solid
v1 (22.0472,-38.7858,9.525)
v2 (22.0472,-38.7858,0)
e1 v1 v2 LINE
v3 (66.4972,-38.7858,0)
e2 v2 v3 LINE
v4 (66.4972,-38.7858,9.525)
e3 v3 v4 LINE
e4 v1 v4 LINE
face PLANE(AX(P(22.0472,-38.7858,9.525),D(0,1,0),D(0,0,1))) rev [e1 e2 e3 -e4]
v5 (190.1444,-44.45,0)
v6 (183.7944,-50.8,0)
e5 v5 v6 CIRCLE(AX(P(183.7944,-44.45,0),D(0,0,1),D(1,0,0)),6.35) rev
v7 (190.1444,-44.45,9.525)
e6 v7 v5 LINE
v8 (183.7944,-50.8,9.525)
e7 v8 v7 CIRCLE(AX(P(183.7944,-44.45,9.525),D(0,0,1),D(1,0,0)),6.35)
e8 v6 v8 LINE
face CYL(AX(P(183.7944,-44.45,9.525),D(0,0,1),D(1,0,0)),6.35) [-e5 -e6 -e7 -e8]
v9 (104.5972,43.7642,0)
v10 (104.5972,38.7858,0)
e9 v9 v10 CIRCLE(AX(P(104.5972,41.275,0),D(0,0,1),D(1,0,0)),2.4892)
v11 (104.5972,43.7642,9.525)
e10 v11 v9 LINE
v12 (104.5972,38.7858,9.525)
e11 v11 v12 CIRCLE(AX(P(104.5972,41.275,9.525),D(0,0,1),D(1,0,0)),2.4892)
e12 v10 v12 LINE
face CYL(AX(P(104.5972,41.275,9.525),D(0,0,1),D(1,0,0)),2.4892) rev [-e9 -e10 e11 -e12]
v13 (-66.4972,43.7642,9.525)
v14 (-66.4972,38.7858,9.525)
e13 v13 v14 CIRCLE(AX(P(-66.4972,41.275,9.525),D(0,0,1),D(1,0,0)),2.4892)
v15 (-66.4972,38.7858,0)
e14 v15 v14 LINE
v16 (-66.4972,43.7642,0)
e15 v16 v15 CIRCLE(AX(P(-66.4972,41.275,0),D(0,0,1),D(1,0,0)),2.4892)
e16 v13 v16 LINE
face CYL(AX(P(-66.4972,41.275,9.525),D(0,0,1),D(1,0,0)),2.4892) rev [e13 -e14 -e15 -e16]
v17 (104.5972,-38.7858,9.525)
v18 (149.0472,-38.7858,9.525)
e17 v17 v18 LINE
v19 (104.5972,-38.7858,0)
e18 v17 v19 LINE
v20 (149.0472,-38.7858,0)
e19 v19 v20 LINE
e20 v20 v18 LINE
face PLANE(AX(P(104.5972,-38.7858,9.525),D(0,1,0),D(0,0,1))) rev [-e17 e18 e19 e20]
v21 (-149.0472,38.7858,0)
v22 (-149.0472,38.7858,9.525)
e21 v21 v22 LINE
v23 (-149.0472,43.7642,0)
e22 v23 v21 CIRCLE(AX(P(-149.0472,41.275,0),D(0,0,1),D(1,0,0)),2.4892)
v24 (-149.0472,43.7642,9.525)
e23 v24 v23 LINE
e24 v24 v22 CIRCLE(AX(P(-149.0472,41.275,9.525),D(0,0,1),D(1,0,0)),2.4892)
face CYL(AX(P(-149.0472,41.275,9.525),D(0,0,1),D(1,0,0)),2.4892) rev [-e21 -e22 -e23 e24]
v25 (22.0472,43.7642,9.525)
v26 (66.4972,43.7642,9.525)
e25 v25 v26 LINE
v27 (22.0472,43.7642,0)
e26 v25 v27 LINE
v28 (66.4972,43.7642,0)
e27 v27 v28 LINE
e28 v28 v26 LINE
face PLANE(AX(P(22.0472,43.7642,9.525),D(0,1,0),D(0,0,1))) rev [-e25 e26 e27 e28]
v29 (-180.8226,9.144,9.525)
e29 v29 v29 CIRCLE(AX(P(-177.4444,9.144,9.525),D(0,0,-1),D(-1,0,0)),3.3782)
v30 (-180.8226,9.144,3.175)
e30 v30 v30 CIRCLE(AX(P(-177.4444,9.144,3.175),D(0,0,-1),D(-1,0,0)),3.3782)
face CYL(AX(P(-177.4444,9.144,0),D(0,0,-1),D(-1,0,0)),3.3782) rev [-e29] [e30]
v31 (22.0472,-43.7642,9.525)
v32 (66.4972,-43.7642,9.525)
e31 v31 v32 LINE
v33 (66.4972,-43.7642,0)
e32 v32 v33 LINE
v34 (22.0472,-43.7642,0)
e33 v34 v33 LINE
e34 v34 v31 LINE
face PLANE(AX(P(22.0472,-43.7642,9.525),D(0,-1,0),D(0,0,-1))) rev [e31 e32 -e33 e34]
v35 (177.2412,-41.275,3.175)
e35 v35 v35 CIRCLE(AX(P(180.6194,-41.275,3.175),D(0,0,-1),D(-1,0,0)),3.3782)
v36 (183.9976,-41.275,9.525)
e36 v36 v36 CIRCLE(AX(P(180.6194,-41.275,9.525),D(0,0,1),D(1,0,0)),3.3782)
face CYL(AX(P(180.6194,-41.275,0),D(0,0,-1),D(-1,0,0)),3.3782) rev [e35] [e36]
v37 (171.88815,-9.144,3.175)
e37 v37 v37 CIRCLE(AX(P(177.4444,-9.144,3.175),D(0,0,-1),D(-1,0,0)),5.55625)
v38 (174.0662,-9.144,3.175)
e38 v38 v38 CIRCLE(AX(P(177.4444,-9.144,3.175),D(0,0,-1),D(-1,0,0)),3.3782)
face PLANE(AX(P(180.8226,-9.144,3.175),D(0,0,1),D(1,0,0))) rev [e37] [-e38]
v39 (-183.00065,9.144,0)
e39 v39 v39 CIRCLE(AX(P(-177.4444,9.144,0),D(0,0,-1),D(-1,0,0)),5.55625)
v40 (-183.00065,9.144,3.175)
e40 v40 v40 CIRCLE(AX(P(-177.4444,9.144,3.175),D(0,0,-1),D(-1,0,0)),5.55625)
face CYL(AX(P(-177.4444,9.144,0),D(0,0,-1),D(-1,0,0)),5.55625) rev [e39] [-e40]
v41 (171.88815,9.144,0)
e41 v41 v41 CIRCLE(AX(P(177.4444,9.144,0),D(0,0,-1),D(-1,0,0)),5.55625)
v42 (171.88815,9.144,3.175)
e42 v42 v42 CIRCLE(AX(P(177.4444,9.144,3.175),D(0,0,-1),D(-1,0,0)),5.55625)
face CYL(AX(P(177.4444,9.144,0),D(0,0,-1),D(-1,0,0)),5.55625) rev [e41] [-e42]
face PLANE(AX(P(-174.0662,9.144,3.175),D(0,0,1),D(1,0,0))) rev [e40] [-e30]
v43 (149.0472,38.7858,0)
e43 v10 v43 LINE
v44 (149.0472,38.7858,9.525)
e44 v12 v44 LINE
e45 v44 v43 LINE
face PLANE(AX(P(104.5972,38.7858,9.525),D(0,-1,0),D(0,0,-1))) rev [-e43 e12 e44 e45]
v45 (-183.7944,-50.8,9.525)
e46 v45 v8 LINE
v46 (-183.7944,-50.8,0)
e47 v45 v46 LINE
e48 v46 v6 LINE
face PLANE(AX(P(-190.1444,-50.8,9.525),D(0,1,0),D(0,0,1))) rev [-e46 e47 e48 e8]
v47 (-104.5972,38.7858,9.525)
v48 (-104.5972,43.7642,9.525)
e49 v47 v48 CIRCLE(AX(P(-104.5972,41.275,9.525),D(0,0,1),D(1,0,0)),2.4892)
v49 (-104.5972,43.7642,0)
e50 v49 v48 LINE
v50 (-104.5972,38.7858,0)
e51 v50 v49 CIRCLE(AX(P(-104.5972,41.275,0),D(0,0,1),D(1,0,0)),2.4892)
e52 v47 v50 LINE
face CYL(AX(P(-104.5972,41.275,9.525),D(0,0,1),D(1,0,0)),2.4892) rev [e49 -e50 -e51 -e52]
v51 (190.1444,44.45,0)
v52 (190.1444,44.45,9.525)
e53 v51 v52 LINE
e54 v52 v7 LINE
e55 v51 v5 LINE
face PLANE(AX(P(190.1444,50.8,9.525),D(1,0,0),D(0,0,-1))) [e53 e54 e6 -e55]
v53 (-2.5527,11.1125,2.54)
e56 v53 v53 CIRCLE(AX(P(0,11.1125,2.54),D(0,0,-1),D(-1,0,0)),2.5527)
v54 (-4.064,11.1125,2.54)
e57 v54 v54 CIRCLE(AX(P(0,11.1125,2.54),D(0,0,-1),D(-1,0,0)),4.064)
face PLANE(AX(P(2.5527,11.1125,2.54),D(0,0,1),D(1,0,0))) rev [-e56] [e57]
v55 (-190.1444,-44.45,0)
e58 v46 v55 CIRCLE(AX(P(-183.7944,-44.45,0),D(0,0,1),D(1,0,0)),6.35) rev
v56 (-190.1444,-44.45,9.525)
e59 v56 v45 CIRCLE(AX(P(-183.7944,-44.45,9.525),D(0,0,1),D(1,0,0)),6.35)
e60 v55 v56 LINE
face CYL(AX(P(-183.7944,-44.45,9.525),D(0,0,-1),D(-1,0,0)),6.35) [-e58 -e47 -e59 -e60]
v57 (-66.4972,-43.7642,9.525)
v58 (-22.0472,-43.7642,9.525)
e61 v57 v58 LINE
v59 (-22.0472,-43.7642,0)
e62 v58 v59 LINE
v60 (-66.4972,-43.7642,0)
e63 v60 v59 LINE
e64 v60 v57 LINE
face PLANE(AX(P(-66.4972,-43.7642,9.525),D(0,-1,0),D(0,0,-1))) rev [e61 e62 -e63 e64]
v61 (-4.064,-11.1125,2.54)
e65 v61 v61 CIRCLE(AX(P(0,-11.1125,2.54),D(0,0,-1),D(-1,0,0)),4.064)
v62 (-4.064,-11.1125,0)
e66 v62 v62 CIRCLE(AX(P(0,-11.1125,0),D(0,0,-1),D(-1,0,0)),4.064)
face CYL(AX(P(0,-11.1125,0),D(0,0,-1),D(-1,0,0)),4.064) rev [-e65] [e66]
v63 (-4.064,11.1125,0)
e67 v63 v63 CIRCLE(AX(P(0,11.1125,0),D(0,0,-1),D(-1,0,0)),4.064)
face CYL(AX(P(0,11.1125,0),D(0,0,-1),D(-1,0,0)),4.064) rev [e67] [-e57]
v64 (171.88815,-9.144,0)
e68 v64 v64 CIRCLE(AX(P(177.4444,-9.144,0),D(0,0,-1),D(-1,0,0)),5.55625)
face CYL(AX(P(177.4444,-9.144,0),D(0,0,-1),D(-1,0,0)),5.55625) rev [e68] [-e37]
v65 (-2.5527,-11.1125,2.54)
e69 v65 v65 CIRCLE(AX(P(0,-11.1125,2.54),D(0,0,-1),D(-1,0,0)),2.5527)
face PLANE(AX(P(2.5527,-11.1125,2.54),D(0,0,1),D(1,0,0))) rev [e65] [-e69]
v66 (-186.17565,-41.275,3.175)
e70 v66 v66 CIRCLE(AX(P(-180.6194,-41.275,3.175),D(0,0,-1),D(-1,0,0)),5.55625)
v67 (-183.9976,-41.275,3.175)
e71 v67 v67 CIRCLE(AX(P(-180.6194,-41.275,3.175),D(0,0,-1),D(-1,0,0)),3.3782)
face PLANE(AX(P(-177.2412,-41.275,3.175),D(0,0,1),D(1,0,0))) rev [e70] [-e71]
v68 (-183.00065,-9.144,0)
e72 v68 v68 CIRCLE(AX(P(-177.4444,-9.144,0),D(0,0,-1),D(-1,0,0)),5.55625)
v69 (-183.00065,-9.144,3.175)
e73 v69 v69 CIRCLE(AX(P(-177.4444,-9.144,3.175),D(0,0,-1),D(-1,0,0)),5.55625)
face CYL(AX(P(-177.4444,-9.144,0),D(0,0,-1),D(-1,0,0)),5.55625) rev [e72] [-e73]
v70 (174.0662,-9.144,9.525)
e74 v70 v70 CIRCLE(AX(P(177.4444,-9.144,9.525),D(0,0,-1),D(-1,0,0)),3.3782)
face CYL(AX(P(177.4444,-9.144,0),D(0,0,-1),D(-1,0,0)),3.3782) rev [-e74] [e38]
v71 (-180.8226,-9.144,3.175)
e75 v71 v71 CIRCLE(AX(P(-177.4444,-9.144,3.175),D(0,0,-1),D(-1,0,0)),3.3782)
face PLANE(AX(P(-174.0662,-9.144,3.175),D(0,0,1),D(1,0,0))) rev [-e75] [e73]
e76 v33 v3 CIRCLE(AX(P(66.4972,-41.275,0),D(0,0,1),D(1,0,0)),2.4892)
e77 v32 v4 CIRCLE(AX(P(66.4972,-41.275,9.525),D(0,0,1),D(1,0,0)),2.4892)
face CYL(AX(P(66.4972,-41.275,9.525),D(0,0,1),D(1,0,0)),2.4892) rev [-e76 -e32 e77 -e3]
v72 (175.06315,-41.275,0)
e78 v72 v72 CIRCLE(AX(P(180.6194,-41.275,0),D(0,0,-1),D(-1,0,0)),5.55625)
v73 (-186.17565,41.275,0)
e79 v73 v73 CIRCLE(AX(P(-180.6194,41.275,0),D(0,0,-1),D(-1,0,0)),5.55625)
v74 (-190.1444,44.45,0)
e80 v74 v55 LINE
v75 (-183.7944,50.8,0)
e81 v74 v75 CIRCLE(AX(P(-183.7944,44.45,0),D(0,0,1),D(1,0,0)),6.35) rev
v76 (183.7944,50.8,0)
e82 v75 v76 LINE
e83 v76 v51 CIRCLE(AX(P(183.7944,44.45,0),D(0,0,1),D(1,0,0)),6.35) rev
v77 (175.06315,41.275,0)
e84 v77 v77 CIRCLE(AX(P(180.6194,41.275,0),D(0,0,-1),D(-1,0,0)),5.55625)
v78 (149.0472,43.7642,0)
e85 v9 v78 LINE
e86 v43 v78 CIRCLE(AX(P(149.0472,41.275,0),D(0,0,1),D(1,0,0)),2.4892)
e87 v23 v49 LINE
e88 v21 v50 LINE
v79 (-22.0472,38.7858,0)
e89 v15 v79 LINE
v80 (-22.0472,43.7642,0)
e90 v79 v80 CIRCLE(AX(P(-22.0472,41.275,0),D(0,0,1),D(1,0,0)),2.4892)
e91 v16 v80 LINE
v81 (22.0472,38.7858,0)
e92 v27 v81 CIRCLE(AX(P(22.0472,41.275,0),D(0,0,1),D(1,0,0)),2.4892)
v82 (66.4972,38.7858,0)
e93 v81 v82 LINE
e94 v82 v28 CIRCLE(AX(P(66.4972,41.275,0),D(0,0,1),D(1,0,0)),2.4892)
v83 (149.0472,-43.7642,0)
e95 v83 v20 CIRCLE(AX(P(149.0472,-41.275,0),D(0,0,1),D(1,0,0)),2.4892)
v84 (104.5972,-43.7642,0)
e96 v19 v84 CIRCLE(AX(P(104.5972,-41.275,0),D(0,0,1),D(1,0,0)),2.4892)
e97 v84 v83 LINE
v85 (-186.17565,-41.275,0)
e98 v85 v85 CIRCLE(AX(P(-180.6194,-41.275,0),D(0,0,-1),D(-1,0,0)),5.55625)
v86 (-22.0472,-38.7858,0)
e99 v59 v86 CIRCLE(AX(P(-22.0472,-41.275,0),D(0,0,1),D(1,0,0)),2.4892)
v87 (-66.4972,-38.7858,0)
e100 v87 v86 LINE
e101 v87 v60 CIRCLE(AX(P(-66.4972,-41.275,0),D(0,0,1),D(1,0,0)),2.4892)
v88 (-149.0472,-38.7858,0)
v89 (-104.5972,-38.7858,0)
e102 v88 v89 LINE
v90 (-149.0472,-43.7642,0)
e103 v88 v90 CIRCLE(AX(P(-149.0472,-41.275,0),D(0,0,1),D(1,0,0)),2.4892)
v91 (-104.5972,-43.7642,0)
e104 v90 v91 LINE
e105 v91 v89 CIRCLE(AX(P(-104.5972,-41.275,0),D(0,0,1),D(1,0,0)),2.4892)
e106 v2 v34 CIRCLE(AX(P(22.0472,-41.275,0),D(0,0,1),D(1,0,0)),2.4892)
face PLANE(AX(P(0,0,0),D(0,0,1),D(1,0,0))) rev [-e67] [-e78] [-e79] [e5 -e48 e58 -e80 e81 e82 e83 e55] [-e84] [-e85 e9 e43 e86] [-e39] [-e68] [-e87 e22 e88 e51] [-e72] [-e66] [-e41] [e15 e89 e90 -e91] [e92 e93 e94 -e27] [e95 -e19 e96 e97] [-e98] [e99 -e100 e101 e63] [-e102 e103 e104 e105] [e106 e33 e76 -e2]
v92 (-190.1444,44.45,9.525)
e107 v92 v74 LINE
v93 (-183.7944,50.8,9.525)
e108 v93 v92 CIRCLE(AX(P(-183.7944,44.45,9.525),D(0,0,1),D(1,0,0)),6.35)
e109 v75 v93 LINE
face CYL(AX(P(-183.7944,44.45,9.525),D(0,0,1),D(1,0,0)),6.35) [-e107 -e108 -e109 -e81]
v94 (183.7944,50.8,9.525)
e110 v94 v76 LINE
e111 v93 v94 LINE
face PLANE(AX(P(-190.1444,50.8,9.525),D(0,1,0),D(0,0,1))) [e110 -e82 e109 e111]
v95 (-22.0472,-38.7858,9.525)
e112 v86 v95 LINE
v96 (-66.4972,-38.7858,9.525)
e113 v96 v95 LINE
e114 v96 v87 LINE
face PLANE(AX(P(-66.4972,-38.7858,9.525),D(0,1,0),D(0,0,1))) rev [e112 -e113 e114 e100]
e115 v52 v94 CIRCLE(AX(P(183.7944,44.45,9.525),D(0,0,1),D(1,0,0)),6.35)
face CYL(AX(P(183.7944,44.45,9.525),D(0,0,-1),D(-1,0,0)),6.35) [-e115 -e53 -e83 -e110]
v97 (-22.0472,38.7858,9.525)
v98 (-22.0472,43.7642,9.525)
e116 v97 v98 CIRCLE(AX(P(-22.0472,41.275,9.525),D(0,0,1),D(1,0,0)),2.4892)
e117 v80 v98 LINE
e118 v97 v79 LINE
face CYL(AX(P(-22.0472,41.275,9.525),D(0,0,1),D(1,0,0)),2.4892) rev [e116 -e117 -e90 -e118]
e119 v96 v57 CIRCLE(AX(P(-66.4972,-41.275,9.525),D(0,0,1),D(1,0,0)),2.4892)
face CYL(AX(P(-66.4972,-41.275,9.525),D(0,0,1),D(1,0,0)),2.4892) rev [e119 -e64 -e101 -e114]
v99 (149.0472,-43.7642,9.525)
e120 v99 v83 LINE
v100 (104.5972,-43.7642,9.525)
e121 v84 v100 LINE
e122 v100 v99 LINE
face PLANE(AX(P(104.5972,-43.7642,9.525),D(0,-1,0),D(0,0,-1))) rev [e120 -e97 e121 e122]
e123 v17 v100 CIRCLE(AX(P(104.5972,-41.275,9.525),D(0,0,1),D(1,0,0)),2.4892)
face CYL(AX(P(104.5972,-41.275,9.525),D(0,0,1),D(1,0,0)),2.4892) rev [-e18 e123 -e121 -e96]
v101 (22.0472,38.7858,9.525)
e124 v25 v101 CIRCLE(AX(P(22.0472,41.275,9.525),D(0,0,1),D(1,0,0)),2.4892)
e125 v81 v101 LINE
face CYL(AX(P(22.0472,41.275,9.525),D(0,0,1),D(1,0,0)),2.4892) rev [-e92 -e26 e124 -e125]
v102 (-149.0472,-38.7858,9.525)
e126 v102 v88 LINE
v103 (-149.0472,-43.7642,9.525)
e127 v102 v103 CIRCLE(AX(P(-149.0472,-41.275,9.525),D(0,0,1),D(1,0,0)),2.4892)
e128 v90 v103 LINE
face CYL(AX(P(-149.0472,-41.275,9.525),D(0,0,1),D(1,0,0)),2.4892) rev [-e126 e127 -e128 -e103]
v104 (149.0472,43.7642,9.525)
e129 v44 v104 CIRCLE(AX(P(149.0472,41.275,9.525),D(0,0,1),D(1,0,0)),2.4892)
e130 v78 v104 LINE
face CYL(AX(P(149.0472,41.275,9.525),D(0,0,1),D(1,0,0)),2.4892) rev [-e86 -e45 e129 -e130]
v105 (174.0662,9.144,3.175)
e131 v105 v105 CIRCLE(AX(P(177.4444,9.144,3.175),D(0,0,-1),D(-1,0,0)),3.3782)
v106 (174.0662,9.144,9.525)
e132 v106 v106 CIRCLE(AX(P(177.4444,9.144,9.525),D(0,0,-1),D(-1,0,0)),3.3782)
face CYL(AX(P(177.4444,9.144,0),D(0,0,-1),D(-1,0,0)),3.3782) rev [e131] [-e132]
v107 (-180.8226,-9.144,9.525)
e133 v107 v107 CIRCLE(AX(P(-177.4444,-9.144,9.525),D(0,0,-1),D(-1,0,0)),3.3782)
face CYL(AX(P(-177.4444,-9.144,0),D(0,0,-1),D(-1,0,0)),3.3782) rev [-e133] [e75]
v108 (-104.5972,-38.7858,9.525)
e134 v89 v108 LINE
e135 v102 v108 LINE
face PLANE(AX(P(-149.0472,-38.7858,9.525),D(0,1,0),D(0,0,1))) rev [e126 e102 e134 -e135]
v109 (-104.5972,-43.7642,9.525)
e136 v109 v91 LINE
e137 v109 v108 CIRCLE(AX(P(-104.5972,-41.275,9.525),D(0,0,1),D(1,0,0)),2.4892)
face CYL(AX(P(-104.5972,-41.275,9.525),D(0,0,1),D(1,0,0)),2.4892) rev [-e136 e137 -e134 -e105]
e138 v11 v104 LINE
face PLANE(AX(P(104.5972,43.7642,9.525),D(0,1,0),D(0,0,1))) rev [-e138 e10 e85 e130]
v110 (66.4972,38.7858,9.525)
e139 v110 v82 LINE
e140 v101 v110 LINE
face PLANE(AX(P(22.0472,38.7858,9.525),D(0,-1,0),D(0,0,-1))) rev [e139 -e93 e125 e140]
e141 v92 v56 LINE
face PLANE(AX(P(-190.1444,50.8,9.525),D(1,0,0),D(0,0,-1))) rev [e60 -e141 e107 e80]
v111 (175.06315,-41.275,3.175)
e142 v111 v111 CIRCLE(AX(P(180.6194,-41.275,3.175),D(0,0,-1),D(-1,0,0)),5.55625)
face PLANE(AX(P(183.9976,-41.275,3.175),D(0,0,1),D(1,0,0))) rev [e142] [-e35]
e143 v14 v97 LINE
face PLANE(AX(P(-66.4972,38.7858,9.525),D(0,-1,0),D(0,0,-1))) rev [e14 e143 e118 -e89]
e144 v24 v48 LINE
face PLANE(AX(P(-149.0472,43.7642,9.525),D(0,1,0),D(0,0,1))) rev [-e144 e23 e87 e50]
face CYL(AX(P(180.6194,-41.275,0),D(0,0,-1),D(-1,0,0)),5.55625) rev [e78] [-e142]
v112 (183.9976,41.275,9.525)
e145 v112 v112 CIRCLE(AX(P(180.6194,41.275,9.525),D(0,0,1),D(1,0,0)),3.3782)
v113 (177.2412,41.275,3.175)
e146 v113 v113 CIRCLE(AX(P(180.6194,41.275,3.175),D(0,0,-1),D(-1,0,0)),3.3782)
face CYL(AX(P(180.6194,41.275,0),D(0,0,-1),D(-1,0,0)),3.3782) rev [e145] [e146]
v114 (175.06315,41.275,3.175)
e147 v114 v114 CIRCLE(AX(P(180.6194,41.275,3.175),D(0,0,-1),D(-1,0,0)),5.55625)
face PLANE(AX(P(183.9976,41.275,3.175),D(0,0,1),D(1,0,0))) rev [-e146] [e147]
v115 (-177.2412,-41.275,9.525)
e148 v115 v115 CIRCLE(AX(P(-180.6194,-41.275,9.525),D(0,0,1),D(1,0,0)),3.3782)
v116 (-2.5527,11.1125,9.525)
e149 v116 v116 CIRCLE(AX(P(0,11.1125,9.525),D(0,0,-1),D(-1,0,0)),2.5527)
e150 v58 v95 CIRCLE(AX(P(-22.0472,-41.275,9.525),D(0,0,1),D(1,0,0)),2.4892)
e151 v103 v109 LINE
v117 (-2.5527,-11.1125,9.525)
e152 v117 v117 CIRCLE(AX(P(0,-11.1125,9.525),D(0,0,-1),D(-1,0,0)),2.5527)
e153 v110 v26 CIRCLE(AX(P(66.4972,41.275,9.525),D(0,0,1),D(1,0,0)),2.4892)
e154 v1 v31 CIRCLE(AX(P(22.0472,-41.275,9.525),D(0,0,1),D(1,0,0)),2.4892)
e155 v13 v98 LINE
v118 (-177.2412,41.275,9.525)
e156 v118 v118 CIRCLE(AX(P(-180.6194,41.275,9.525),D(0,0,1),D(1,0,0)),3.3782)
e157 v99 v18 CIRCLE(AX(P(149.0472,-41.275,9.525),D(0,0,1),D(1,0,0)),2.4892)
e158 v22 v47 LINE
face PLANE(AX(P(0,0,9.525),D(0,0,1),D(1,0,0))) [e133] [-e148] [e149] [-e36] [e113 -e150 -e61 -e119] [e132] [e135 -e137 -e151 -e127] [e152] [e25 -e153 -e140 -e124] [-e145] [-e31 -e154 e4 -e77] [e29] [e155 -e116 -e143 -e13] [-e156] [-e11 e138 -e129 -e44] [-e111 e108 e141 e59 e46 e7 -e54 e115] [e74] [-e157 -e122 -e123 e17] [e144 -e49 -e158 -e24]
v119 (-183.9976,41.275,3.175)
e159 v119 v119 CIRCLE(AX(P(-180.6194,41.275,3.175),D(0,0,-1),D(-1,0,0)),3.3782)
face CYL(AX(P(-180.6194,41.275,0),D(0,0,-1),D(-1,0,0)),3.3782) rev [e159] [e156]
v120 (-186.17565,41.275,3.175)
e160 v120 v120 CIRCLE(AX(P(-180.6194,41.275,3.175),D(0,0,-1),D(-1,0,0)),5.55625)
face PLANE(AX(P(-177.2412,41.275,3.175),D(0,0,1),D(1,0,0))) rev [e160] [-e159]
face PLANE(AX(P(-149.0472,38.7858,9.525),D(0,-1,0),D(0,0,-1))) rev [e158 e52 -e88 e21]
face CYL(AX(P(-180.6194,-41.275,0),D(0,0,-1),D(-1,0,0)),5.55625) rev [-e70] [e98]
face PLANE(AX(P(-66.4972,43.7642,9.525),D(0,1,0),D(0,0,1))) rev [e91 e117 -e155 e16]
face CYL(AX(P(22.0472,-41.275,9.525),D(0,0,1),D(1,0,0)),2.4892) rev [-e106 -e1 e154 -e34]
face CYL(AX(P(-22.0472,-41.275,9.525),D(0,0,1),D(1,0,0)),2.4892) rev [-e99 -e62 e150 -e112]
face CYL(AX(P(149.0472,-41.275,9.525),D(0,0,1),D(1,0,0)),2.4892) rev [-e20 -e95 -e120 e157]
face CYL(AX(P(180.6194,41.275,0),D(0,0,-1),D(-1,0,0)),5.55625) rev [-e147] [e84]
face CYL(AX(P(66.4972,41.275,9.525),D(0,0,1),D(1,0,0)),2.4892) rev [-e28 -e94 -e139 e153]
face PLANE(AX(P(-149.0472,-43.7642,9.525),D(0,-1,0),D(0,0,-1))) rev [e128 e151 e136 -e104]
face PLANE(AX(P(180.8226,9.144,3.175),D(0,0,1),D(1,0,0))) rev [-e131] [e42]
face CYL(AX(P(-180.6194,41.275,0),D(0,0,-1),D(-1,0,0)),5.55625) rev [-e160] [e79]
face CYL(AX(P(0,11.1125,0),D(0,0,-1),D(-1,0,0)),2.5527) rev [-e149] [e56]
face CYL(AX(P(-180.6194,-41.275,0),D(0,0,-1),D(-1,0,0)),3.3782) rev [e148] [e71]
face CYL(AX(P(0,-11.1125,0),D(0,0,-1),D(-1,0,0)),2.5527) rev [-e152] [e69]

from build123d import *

# Parameters (mm, degrees)
SKETCH1_W                                            = 380.2888
SKETCH1_H                                            = 101.6
BOSS_EXTRUDE1_DEPTH                                  = 9.525
F_10_CLEARANCE_SLOT1_DEPTH                           = 9.525
FILLET1_R                                            = 6.35
CBORE_FOR_1_4_SOCKET_HEAD_CAP_SCREW4_D               = 6.7564
CBORE_FOR_1_4_SOCKET_HEAD_CAP_SCREW4_CBORE_D         = 11.1125
CBORE_FOR_1_4_SOCKET_HEAD_CAP_SCREW4_CBORE_DEPTH     = 3.175
CBORE_FOR_10_SOCKET_HEAD_CAP_SCREW1_D                = 5.1054
CBORE_FOR_10_SOCKET_HEAD_CAP_SCREW1_CBORE_D          = 8.128
CBORE_FOR_10_SOCKET_HEAD_CAP_SCREW1_CBORE_DEPTH      = 2.54
CBORE_FOR_1_4_BINDING_HEAD_MACHINE_SCREW_D           = 6.7564
CBORE_FOR_1_4_BINDING_HEAD_MACHINE_SCREW_DEPTH       = 12.827
CBORE_FOR_1_4_BINDING_HEAD_MACHINE_SCREW_CBORE_D     = 11.1125
CBORE_FOR_1_4_BINDING_HEAD_MACHINE_SCREW_CBORE_DEPTH = 3.175


# Read off the part's stored shape, not the designer's step: #10 Clearance Slot1
with BuildPart() as part:
    # Sketch1 → Boss-Extrude1 (new body)
    with BuildSketch(Plane.XY):
        Rectangle(SKETCH1_W, SKETCH1_H)
    extrude(amount=BOSS_EXTRUDE1_DEPTH)

    # #10 Clearance Slot1 outline → #10 Clearance Slot1 (cut)
    with BuildSketch(Plane.XY):
        with BuildLine():
            Line((-149.0472, 38.7858), (-104.5972, 38.7858))
            ThreePointArc((-104.5972, 38.7858), (-102.108, 41.275), (-104.5972, 43.7642))
            Line((-104.5972, 43.7642), (-149.0472, 43.7642))
            ThreePointArc((-149.0472, 43.7642), (-151.5364, 41.275), (-149.0472, 38.7858))
        make_face()
        with BuildLine():
            ThreePointArc((-22.0472, 38.7858), (-19.558, 41.275), (-22.0472, 43.7642))
            Line((-22.0472, 43.7642), (-66.4972, 43.7642))
            ThreePointArc((-66.4972, 43.7642), (-68.9864, 41.275), (-66.4972, 38.7858))
            Line((-66.4972, 38.7858), (-22.0472, 38.7858))
        make_face()
        with BuildLine():
            ThreePointArc((66.4972, 38.7858), (68.9864, 41.275), (66.4972, 43.7642))
            Line((66.4972, 43.7642), (22.0472, 43.7642))
            ThreePointArc((22.0472, 43.7642), (19.558, 41.275), (22.0472, 38.7858))
            Line((22.0472, 38.7858), (66.4972, 38.7858))
        make_face()
        with BuildLine():
            ThreePointArc((149.0472, 38.7858), (151.5364, 41.275), (149.0472, 43.7642))
            Line((149.0472, 43.7642), (104.5972, 43.7642))
            ThreePointArc((104.5972, 43.7642), (102.108, 41.275), (104.5972, 38.7858))
            Line((104.5972, 38.7858), (149.0472, 38.7858))
        make_face()
        with BuildLine():
            Line((104.5972, -43.7642), (149.0472, -43.7642))
            ThreePointArc((149.0472, -43.7642), (151.5364, -41.275), (149.0472, -38.7858))
            Line((149.0472, -38.7858), (104.5972, -38.7858))
            ThreePointArc((104.5972, -38.7858), (102.108, -41.275), (104.5972, -43.7642))
        make_face()
        with BuildLine():
            ThreePointArc((66.4972, -43.7642), (68.9864, -41.275), (66.4972, -38.7858))
            Line((66.4972, -38.7858), (22.0472, -38.7858))
            ThreePointArc((22.0472, -38.7858), (19.558, -41.275), (22.0472, -43.7642))
            Line((22.0472, -43.7642), (66.4972, -43.7642))
        make_face()
        with BuildLine():
            ThreePointArc((-22.0472, -43.7642), (-19.558, -41.275), (-22.0472, -38.7858))
            Line((-22.0472, -38.7858), (-66.4972, -38.7858))
            ThreePointArc((-66.4972, -38.7858), (-68.9864, -41.275), (-66.4972, -43.7642))
            Line((-66.4972, -43.7642), (-22.0472, -43.7642))
        make_face()
        with BuildLine():
            ThreePointArc((-104.5972, -43.7642), (-102.108, -41.275), (-104.5972, -38.7858))
            Line((-104.5972, -38.7858), (-149.0472, -38.7858))
            ThreePointArc((-149.0472, -38.7858), (-151.5364, -41.275), (-149.0472, -43.7642))
            Line((-149.0472, -43.7642), (-104.5972, -43.7642))
        make_face()
    extrude(amount=F_10_CLEARANCE_SLOT1_DEPTH, mode=Mode.SUBTRACT)

    # Fillet1
    fillet1_edges = [part.edges().sort_by_distance(p)[0] for p in [
        (-190.1444, 50.8, 4.7625),
        (190.1444, 50.8, 4.7625),
        (190.1444, -50.8, 4.7625),
        (-190.1444, -50.8, 4.7625),
    ]]
    fillet(fillet1_edges, radius=FILLET1_R)

    # CBORE for 1/4 Socket Head Cap Screw4 (through all)
    with Locations(Plane(origin=(0, 0, 0), x_dir=(-1, 0, 0), z_dir=(0, 0, -1))):
        with Locations((-177.4444, 9.144), (-177.4444, -9.144), (177.4444, 9.144), (177.4444, -9.144)):
            CounterBoreHole(CBORE_FOR_1_4_SOCKET_HEAD_CAP_SCREW4_D / 2, CBORE_FOR_1_4_SOCKET_HEAD_CAP_SCREW4_CBORE_D / 2, CBORE_FOR_1_4_SOCKET_HEAD_CAP_SCREW4_CBORE_DEPTH)

    # CBORE for #10 Socket Head Cap Screw1 (through all)
    with Locations(Plane(origin=(0, 0, 0), x_dir=(-1, 0, 0), z_dir=(0, 0, -1))):
        with Locations((0, 11.1125), (0, -11.1125)):
            CounterBoreHole(CBORE_FOR_10_SOCKET_HEAD_CAP_SCREW1_D / 2, CBORE_FOR_10_SOCKET_HEAD_CAP_SCREW1_CBORE_D / 2, CBORE_FOR_10_SOCKET_HEAD_CAP_SCREW1_CBORE_DEPTH)

    # CBORE for 1/4 Binding Head Machine Screw1
    with Locations(Plane(origin=(0, 0, 0), x_dir=(-1, 0, 0), z_dir=(0, 0, -1))):
        with Locations((180.6194, 41.275), (180.6194, -41.275), (-180.6194, 41.275), (-180.6194, -41.275)):
            CounterBoreHole(CBORE_FOR_1_4_BINDING_HEAD_MACHINE_SCREW_D / 2, CBORE_FOR_1_4_BINDING_HEAD_MACHINE_SCREW_CBORE_D / 2, CBORE_FOR_1_4_BINDING_HEAD_MACHINE_SCREW_CBORE_DEPTH, depth=CBORE_FOR_1_4_BINDING_HEAD_MACHINE_SCREW_DEPTH)


solid = part.part
